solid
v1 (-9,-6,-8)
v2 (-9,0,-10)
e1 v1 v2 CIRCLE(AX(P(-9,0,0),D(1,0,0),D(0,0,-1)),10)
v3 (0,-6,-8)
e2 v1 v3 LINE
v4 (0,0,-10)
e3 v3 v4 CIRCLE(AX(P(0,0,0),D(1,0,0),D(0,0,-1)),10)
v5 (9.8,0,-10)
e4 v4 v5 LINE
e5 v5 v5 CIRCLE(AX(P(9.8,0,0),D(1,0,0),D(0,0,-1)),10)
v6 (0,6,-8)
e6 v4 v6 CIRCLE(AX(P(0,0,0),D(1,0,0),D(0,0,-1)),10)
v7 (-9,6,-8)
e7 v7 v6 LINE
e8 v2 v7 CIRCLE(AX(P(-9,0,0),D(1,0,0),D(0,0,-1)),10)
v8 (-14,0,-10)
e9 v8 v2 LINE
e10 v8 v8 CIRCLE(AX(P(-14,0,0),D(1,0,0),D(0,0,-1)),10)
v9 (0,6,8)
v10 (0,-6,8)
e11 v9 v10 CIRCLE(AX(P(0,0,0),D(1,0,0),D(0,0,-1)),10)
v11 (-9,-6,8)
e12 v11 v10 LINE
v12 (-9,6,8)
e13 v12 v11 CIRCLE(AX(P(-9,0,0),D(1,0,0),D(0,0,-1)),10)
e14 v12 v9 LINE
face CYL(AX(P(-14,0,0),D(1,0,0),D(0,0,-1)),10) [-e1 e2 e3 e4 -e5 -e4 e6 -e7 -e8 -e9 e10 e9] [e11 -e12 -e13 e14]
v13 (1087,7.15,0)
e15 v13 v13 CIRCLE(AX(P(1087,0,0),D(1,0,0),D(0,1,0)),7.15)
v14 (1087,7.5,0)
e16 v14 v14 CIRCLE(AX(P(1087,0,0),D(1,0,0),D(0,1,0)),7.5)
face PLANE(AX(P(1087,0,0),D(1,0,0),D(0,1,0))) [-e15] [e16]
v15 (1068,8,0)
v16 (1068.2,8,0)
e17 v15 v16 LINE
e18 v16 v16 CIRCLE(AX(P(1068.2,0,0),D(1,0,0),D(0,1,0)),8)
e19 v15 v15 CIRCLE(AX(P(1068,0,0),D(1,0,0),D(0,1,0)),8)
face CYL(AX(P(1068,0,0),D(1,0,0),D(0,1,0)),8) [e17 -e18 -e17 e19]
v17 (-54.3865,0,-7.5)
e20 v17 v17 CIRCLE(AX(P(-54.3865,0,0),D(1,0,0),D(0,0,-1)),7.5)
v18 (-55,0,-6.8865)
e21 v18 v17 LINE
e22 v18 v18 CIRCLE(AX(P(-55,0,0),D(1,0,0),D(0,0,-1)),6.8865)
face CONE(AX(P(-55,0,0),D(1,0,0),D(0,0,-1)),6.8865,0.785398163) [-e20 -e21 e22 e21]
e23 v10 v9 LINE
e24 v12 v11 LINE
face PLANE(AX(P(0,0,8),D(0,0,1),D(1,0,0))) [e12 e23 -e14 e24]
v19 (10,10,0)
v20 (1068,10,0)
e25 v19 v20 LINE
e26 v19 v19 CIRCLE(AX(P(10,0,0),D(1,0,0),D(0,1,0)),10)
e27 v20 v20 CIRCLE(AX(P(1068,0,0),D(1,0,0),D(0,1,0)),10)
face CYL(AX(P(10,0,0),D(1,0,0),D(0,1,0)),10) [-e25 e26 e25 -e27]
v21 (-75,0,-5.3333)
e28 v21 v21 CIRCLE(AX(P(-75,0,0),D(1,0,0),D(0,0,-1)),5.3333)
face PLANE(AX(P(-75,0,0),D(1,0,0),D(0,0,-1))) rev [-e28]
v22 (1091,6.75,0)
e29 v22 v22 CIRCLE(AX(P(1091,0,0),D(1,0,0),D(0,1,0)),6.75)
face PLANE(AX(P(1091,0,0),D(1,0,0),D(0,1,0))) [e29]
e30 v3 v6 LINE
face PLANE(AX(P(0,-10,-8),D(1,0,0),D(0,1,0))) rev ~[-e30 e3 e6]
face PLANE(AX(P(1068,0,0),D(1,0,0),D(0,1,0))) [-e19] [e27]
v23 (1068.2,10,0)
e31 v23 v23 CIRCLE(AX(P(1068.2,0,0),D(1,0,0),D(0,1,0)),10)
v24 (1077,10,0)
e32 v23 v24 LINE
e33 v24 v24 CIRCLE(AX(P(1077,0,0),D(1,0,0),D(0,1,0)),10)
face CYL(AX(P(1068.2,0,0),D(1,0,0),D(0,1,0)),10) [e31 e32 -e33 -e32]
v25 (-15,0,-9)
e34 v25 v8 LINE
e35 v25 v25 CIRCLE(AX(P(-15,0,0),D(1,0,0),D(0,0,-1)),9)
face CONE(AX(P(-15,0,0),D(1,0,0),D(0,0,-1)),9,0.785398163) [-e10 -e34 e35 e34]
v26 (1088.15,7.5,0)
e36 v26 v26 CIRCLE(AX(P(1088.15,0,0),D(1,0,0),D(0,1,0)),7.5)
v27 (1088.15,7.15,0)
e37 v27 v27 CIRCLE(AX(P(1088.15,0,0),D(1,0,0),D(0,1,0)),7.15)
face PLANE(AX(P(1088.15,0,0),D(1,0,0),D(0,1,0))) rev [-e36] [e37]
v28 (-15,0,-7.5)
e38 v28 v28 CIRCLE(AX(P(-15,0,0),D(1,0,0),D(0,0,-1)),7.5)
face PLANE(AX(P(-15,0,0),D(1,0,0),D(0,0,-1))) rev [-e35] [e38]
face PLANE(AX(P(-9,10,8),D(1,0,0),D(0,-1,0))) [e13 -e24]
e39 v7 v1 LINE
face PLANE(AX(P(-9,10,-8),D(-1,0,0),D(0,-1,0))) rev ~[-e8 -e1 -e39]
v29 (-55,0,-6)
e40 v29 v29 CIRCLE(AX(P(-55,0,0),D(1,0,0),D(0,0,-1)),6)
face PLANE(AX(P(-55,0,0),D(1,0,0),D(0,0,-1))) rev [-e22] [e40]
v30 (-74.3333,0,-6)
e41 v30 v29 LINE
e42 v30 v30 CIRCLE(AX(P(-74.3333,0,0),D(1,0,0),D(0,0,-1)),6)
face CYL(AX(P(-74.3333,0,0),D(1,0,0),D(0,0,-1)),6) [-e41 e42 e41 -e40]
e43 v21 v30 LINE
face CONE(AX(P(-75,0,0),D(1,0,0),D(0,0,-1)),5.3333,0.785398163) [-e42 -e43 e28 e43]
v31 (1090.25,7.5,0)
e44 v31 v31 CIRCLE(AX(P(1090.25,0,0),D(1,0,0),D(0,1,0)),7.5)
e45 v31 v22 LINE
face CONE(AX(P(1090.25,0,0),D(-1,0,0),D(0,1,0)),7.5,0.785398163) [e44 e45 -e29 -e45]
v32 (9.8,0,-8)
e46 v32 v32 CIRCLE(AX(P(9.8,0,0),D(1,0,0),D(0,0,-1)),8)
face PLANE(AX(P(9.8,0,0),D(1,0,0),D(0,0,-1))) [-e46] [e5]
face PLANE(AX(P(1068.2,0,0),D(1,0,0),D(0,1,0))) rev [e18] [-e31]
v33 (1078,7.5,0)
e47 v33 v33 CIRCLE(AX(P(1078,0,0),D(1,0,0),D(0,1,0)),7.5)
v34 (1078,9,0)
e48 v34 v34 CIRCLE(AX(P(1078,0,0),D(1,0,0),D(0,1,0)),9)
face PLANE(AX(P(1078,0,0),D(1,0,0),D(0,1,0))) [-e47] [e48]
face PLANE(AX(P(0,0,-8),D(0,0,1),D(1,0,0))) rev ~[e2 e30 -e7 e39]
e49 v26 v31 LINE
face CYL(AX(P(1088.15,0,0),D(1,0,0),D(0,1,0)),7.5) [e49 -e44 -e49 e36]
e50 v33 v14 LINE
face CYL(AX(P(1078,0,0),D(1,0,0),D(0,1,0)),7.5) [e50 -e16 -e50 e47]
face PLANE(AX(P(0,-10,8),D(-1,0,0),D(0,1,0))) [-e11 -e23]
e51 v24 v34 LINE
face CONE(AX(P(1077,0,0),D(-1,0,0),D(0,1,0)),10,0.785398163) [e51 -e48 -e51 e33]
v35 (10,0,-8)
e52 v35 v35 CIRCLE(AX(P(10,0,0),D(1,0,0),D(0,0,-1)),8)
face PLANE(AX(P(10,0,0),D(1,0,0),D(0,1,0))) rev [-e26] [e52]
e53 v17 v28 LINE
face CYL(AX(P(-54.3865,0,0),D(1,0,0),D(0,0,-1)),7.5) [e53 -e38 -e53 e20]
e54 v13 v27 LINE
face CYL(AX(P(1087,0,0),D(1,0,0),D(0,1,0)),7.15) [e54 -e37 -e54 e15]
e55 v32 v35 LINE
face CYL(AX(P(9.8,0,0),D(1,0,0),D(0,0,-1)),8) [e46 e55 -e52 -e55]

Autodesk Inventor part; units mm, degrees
sketch "Sketch_1" plane through (0, 0, 0) normal (0, 0, 1) x (1, 0, 0)
  line L0 (1068, 0) -> (10, 0)
  line L1 (10, 0) -> (10, 10)
  line L2 (10, 10) -> (1068, 10)
  line L3 (1068, 10) -> (1068, 0)
  line L4 (1068, 0) -> (10, 0)
revolve "Revolution1" add sketch "Sketch_1" angle 360 about axis through (1068, 0, 0) along (1, 0, 0)
thread "Thread1" size "M20x2.5" class "6g" standard "ISO Metric profile" full length
sketch "Sketch_10" plane through (0, 0, 0) normal (0, 1, 0) x (-1, 0, 0)
  line L0 (-10, 0) -> (75, 0)
  line L1 (75, 0) -> (75, -5.3333)
  line L2 (75, -5.3333) -> (74.3333, -6)
  line L3 (74.3333, -6) -> (55, -6)
  line L4 (55, -6) -> (55, -6.8865)
  line L5 (55, -6.8865) -> (54.3865, -7.5)
  line L6 (54.3865, -7.5) -> (15, -7.5)
  line L7 (15, -7.5) -> (15, -9)
  line L8 (15, -9) -> (14, -10)
  line L9 (14, -10) -> (-9.8, -10)
  line L10 (-9.8, -10) -> (-9.8, -8)
  line L11 (-9.8, -8) -> (-10, -8)
  line L12 (-10, -8) -> (-10, 0)
  line L13 (-10, 0) -> (75, 0)
revolve "Revolution2" add sketch "Sketch_10" angle 360 about axis through (10, 0, 0) along (1, 0, 0)
thread "Thread2" size "M15x1" class "6g" standard "ISO Metric profile" length 11.3865
sketch "Sketch_11" plane through (0, 0, 8) normal (0, 0, 1) x (1, 0, 0)
  line L0 (-9, -10) -> (0, -10)
  line L1 (0, -10) -> (0, 10)
  line L2 (0, 10) -> (-9, 10)
  line L3 (-9, 10) -> (-9, -10)
extrude "Extrusion1" cut sketch "Sketch_11" along normal blind 4
sketch "Sketch_12" plane through (0, 0, -8) normal (0, 0, 1) x (1, 0, 0)
  line L0 (-9, -10) -> (0, -10)
  line L1 (0, -10) -> (0, 10)
  line L2 (0, 10) -> (-9, 10)
  line L3 (-9, 10) -> (-9, -10)
extrude "Extrusion2" cut sketch "Sketch_12" against normal blind 4
sketch "Sketch_16" plane through (0, 0, 0) normal (0, 0, 1) x (1, 0, 0)
  line L0 (1091, 0) -> (1068, 0)
  line L1 (1068, 0) -> (1068, 8)
  line L2 (1068, 8) -> (1068.2, 8)
  line L3 (1068.2, 8) -> (1068.2, 10)
  line L4 (1068.2, 10) -> (1077, 10)
  line L5 (1077, 10) -> (1078, 9)
  line L6 (1078, 9) -> (1078, 7.5)
  line L7 (1078, 7.5) -> (1087, 7.5)
  line L8 (1087, 7.5) -> (1087, 7.15)
  line L9 (1087, 7.15) -> (1088.15, 7.15)
  line L10 (1088.15, 7.15) -> (1088.15, 7.5)
  line L11 (1088.15, 7.5) -> (1090.25, 7.5)
  line L12 (1090.25, 7.5) -> (1091, 6.75)
  line L13 (1091, 6.75) -> (1091, 0)
  line L14 (1091, 0) -> (1068, 0)
revolve "Revolution3" add sketch "Sketch_16" angle 360 about axis through (1091, 0, 0) along (1, 0, 0)
ref_plane "FSS_XY" through (-15, 0, 0) normal (1, 0, 0) x (0, 0, -1)
ref_plane "FSS_YZ" through (-15, 0, 0) normal (0, 0, -1) x (0, 1, 0)
ref_plane "FSS_ZX" through (-15, 0, 0) normal (0, 1, 0) x (1, 0, 0)
ref_plane "SSS_XY" through (1078, 0, 0) normal (1, 0, 0) x (0, 0, -1)
ref_plane "SSS_YZ" through (1078, 0, 0) normal (0, 0, -1) x (0, 1, 0)
ref_plane "SSS_ZX" through (1078, 0, 0) normal (0, 1, 0) x (1, 0, 0)
ref_plane "bnt_s_1_XY" through (0, 0, 0) normal (-1, 0, 0) x (0, 0, -1)
ref_plane "bnt_s_1_YZ" through (0, 0, 0) normal (0, 0, -1) x (0, -1, 0)
ref_plane "bnt_s_1_ZX" through (0, 0, 0) normal (0, -1, 0) x (-1, 0, 0)
properties part number "BNT 2010-2.61000-J1K Shaft"
